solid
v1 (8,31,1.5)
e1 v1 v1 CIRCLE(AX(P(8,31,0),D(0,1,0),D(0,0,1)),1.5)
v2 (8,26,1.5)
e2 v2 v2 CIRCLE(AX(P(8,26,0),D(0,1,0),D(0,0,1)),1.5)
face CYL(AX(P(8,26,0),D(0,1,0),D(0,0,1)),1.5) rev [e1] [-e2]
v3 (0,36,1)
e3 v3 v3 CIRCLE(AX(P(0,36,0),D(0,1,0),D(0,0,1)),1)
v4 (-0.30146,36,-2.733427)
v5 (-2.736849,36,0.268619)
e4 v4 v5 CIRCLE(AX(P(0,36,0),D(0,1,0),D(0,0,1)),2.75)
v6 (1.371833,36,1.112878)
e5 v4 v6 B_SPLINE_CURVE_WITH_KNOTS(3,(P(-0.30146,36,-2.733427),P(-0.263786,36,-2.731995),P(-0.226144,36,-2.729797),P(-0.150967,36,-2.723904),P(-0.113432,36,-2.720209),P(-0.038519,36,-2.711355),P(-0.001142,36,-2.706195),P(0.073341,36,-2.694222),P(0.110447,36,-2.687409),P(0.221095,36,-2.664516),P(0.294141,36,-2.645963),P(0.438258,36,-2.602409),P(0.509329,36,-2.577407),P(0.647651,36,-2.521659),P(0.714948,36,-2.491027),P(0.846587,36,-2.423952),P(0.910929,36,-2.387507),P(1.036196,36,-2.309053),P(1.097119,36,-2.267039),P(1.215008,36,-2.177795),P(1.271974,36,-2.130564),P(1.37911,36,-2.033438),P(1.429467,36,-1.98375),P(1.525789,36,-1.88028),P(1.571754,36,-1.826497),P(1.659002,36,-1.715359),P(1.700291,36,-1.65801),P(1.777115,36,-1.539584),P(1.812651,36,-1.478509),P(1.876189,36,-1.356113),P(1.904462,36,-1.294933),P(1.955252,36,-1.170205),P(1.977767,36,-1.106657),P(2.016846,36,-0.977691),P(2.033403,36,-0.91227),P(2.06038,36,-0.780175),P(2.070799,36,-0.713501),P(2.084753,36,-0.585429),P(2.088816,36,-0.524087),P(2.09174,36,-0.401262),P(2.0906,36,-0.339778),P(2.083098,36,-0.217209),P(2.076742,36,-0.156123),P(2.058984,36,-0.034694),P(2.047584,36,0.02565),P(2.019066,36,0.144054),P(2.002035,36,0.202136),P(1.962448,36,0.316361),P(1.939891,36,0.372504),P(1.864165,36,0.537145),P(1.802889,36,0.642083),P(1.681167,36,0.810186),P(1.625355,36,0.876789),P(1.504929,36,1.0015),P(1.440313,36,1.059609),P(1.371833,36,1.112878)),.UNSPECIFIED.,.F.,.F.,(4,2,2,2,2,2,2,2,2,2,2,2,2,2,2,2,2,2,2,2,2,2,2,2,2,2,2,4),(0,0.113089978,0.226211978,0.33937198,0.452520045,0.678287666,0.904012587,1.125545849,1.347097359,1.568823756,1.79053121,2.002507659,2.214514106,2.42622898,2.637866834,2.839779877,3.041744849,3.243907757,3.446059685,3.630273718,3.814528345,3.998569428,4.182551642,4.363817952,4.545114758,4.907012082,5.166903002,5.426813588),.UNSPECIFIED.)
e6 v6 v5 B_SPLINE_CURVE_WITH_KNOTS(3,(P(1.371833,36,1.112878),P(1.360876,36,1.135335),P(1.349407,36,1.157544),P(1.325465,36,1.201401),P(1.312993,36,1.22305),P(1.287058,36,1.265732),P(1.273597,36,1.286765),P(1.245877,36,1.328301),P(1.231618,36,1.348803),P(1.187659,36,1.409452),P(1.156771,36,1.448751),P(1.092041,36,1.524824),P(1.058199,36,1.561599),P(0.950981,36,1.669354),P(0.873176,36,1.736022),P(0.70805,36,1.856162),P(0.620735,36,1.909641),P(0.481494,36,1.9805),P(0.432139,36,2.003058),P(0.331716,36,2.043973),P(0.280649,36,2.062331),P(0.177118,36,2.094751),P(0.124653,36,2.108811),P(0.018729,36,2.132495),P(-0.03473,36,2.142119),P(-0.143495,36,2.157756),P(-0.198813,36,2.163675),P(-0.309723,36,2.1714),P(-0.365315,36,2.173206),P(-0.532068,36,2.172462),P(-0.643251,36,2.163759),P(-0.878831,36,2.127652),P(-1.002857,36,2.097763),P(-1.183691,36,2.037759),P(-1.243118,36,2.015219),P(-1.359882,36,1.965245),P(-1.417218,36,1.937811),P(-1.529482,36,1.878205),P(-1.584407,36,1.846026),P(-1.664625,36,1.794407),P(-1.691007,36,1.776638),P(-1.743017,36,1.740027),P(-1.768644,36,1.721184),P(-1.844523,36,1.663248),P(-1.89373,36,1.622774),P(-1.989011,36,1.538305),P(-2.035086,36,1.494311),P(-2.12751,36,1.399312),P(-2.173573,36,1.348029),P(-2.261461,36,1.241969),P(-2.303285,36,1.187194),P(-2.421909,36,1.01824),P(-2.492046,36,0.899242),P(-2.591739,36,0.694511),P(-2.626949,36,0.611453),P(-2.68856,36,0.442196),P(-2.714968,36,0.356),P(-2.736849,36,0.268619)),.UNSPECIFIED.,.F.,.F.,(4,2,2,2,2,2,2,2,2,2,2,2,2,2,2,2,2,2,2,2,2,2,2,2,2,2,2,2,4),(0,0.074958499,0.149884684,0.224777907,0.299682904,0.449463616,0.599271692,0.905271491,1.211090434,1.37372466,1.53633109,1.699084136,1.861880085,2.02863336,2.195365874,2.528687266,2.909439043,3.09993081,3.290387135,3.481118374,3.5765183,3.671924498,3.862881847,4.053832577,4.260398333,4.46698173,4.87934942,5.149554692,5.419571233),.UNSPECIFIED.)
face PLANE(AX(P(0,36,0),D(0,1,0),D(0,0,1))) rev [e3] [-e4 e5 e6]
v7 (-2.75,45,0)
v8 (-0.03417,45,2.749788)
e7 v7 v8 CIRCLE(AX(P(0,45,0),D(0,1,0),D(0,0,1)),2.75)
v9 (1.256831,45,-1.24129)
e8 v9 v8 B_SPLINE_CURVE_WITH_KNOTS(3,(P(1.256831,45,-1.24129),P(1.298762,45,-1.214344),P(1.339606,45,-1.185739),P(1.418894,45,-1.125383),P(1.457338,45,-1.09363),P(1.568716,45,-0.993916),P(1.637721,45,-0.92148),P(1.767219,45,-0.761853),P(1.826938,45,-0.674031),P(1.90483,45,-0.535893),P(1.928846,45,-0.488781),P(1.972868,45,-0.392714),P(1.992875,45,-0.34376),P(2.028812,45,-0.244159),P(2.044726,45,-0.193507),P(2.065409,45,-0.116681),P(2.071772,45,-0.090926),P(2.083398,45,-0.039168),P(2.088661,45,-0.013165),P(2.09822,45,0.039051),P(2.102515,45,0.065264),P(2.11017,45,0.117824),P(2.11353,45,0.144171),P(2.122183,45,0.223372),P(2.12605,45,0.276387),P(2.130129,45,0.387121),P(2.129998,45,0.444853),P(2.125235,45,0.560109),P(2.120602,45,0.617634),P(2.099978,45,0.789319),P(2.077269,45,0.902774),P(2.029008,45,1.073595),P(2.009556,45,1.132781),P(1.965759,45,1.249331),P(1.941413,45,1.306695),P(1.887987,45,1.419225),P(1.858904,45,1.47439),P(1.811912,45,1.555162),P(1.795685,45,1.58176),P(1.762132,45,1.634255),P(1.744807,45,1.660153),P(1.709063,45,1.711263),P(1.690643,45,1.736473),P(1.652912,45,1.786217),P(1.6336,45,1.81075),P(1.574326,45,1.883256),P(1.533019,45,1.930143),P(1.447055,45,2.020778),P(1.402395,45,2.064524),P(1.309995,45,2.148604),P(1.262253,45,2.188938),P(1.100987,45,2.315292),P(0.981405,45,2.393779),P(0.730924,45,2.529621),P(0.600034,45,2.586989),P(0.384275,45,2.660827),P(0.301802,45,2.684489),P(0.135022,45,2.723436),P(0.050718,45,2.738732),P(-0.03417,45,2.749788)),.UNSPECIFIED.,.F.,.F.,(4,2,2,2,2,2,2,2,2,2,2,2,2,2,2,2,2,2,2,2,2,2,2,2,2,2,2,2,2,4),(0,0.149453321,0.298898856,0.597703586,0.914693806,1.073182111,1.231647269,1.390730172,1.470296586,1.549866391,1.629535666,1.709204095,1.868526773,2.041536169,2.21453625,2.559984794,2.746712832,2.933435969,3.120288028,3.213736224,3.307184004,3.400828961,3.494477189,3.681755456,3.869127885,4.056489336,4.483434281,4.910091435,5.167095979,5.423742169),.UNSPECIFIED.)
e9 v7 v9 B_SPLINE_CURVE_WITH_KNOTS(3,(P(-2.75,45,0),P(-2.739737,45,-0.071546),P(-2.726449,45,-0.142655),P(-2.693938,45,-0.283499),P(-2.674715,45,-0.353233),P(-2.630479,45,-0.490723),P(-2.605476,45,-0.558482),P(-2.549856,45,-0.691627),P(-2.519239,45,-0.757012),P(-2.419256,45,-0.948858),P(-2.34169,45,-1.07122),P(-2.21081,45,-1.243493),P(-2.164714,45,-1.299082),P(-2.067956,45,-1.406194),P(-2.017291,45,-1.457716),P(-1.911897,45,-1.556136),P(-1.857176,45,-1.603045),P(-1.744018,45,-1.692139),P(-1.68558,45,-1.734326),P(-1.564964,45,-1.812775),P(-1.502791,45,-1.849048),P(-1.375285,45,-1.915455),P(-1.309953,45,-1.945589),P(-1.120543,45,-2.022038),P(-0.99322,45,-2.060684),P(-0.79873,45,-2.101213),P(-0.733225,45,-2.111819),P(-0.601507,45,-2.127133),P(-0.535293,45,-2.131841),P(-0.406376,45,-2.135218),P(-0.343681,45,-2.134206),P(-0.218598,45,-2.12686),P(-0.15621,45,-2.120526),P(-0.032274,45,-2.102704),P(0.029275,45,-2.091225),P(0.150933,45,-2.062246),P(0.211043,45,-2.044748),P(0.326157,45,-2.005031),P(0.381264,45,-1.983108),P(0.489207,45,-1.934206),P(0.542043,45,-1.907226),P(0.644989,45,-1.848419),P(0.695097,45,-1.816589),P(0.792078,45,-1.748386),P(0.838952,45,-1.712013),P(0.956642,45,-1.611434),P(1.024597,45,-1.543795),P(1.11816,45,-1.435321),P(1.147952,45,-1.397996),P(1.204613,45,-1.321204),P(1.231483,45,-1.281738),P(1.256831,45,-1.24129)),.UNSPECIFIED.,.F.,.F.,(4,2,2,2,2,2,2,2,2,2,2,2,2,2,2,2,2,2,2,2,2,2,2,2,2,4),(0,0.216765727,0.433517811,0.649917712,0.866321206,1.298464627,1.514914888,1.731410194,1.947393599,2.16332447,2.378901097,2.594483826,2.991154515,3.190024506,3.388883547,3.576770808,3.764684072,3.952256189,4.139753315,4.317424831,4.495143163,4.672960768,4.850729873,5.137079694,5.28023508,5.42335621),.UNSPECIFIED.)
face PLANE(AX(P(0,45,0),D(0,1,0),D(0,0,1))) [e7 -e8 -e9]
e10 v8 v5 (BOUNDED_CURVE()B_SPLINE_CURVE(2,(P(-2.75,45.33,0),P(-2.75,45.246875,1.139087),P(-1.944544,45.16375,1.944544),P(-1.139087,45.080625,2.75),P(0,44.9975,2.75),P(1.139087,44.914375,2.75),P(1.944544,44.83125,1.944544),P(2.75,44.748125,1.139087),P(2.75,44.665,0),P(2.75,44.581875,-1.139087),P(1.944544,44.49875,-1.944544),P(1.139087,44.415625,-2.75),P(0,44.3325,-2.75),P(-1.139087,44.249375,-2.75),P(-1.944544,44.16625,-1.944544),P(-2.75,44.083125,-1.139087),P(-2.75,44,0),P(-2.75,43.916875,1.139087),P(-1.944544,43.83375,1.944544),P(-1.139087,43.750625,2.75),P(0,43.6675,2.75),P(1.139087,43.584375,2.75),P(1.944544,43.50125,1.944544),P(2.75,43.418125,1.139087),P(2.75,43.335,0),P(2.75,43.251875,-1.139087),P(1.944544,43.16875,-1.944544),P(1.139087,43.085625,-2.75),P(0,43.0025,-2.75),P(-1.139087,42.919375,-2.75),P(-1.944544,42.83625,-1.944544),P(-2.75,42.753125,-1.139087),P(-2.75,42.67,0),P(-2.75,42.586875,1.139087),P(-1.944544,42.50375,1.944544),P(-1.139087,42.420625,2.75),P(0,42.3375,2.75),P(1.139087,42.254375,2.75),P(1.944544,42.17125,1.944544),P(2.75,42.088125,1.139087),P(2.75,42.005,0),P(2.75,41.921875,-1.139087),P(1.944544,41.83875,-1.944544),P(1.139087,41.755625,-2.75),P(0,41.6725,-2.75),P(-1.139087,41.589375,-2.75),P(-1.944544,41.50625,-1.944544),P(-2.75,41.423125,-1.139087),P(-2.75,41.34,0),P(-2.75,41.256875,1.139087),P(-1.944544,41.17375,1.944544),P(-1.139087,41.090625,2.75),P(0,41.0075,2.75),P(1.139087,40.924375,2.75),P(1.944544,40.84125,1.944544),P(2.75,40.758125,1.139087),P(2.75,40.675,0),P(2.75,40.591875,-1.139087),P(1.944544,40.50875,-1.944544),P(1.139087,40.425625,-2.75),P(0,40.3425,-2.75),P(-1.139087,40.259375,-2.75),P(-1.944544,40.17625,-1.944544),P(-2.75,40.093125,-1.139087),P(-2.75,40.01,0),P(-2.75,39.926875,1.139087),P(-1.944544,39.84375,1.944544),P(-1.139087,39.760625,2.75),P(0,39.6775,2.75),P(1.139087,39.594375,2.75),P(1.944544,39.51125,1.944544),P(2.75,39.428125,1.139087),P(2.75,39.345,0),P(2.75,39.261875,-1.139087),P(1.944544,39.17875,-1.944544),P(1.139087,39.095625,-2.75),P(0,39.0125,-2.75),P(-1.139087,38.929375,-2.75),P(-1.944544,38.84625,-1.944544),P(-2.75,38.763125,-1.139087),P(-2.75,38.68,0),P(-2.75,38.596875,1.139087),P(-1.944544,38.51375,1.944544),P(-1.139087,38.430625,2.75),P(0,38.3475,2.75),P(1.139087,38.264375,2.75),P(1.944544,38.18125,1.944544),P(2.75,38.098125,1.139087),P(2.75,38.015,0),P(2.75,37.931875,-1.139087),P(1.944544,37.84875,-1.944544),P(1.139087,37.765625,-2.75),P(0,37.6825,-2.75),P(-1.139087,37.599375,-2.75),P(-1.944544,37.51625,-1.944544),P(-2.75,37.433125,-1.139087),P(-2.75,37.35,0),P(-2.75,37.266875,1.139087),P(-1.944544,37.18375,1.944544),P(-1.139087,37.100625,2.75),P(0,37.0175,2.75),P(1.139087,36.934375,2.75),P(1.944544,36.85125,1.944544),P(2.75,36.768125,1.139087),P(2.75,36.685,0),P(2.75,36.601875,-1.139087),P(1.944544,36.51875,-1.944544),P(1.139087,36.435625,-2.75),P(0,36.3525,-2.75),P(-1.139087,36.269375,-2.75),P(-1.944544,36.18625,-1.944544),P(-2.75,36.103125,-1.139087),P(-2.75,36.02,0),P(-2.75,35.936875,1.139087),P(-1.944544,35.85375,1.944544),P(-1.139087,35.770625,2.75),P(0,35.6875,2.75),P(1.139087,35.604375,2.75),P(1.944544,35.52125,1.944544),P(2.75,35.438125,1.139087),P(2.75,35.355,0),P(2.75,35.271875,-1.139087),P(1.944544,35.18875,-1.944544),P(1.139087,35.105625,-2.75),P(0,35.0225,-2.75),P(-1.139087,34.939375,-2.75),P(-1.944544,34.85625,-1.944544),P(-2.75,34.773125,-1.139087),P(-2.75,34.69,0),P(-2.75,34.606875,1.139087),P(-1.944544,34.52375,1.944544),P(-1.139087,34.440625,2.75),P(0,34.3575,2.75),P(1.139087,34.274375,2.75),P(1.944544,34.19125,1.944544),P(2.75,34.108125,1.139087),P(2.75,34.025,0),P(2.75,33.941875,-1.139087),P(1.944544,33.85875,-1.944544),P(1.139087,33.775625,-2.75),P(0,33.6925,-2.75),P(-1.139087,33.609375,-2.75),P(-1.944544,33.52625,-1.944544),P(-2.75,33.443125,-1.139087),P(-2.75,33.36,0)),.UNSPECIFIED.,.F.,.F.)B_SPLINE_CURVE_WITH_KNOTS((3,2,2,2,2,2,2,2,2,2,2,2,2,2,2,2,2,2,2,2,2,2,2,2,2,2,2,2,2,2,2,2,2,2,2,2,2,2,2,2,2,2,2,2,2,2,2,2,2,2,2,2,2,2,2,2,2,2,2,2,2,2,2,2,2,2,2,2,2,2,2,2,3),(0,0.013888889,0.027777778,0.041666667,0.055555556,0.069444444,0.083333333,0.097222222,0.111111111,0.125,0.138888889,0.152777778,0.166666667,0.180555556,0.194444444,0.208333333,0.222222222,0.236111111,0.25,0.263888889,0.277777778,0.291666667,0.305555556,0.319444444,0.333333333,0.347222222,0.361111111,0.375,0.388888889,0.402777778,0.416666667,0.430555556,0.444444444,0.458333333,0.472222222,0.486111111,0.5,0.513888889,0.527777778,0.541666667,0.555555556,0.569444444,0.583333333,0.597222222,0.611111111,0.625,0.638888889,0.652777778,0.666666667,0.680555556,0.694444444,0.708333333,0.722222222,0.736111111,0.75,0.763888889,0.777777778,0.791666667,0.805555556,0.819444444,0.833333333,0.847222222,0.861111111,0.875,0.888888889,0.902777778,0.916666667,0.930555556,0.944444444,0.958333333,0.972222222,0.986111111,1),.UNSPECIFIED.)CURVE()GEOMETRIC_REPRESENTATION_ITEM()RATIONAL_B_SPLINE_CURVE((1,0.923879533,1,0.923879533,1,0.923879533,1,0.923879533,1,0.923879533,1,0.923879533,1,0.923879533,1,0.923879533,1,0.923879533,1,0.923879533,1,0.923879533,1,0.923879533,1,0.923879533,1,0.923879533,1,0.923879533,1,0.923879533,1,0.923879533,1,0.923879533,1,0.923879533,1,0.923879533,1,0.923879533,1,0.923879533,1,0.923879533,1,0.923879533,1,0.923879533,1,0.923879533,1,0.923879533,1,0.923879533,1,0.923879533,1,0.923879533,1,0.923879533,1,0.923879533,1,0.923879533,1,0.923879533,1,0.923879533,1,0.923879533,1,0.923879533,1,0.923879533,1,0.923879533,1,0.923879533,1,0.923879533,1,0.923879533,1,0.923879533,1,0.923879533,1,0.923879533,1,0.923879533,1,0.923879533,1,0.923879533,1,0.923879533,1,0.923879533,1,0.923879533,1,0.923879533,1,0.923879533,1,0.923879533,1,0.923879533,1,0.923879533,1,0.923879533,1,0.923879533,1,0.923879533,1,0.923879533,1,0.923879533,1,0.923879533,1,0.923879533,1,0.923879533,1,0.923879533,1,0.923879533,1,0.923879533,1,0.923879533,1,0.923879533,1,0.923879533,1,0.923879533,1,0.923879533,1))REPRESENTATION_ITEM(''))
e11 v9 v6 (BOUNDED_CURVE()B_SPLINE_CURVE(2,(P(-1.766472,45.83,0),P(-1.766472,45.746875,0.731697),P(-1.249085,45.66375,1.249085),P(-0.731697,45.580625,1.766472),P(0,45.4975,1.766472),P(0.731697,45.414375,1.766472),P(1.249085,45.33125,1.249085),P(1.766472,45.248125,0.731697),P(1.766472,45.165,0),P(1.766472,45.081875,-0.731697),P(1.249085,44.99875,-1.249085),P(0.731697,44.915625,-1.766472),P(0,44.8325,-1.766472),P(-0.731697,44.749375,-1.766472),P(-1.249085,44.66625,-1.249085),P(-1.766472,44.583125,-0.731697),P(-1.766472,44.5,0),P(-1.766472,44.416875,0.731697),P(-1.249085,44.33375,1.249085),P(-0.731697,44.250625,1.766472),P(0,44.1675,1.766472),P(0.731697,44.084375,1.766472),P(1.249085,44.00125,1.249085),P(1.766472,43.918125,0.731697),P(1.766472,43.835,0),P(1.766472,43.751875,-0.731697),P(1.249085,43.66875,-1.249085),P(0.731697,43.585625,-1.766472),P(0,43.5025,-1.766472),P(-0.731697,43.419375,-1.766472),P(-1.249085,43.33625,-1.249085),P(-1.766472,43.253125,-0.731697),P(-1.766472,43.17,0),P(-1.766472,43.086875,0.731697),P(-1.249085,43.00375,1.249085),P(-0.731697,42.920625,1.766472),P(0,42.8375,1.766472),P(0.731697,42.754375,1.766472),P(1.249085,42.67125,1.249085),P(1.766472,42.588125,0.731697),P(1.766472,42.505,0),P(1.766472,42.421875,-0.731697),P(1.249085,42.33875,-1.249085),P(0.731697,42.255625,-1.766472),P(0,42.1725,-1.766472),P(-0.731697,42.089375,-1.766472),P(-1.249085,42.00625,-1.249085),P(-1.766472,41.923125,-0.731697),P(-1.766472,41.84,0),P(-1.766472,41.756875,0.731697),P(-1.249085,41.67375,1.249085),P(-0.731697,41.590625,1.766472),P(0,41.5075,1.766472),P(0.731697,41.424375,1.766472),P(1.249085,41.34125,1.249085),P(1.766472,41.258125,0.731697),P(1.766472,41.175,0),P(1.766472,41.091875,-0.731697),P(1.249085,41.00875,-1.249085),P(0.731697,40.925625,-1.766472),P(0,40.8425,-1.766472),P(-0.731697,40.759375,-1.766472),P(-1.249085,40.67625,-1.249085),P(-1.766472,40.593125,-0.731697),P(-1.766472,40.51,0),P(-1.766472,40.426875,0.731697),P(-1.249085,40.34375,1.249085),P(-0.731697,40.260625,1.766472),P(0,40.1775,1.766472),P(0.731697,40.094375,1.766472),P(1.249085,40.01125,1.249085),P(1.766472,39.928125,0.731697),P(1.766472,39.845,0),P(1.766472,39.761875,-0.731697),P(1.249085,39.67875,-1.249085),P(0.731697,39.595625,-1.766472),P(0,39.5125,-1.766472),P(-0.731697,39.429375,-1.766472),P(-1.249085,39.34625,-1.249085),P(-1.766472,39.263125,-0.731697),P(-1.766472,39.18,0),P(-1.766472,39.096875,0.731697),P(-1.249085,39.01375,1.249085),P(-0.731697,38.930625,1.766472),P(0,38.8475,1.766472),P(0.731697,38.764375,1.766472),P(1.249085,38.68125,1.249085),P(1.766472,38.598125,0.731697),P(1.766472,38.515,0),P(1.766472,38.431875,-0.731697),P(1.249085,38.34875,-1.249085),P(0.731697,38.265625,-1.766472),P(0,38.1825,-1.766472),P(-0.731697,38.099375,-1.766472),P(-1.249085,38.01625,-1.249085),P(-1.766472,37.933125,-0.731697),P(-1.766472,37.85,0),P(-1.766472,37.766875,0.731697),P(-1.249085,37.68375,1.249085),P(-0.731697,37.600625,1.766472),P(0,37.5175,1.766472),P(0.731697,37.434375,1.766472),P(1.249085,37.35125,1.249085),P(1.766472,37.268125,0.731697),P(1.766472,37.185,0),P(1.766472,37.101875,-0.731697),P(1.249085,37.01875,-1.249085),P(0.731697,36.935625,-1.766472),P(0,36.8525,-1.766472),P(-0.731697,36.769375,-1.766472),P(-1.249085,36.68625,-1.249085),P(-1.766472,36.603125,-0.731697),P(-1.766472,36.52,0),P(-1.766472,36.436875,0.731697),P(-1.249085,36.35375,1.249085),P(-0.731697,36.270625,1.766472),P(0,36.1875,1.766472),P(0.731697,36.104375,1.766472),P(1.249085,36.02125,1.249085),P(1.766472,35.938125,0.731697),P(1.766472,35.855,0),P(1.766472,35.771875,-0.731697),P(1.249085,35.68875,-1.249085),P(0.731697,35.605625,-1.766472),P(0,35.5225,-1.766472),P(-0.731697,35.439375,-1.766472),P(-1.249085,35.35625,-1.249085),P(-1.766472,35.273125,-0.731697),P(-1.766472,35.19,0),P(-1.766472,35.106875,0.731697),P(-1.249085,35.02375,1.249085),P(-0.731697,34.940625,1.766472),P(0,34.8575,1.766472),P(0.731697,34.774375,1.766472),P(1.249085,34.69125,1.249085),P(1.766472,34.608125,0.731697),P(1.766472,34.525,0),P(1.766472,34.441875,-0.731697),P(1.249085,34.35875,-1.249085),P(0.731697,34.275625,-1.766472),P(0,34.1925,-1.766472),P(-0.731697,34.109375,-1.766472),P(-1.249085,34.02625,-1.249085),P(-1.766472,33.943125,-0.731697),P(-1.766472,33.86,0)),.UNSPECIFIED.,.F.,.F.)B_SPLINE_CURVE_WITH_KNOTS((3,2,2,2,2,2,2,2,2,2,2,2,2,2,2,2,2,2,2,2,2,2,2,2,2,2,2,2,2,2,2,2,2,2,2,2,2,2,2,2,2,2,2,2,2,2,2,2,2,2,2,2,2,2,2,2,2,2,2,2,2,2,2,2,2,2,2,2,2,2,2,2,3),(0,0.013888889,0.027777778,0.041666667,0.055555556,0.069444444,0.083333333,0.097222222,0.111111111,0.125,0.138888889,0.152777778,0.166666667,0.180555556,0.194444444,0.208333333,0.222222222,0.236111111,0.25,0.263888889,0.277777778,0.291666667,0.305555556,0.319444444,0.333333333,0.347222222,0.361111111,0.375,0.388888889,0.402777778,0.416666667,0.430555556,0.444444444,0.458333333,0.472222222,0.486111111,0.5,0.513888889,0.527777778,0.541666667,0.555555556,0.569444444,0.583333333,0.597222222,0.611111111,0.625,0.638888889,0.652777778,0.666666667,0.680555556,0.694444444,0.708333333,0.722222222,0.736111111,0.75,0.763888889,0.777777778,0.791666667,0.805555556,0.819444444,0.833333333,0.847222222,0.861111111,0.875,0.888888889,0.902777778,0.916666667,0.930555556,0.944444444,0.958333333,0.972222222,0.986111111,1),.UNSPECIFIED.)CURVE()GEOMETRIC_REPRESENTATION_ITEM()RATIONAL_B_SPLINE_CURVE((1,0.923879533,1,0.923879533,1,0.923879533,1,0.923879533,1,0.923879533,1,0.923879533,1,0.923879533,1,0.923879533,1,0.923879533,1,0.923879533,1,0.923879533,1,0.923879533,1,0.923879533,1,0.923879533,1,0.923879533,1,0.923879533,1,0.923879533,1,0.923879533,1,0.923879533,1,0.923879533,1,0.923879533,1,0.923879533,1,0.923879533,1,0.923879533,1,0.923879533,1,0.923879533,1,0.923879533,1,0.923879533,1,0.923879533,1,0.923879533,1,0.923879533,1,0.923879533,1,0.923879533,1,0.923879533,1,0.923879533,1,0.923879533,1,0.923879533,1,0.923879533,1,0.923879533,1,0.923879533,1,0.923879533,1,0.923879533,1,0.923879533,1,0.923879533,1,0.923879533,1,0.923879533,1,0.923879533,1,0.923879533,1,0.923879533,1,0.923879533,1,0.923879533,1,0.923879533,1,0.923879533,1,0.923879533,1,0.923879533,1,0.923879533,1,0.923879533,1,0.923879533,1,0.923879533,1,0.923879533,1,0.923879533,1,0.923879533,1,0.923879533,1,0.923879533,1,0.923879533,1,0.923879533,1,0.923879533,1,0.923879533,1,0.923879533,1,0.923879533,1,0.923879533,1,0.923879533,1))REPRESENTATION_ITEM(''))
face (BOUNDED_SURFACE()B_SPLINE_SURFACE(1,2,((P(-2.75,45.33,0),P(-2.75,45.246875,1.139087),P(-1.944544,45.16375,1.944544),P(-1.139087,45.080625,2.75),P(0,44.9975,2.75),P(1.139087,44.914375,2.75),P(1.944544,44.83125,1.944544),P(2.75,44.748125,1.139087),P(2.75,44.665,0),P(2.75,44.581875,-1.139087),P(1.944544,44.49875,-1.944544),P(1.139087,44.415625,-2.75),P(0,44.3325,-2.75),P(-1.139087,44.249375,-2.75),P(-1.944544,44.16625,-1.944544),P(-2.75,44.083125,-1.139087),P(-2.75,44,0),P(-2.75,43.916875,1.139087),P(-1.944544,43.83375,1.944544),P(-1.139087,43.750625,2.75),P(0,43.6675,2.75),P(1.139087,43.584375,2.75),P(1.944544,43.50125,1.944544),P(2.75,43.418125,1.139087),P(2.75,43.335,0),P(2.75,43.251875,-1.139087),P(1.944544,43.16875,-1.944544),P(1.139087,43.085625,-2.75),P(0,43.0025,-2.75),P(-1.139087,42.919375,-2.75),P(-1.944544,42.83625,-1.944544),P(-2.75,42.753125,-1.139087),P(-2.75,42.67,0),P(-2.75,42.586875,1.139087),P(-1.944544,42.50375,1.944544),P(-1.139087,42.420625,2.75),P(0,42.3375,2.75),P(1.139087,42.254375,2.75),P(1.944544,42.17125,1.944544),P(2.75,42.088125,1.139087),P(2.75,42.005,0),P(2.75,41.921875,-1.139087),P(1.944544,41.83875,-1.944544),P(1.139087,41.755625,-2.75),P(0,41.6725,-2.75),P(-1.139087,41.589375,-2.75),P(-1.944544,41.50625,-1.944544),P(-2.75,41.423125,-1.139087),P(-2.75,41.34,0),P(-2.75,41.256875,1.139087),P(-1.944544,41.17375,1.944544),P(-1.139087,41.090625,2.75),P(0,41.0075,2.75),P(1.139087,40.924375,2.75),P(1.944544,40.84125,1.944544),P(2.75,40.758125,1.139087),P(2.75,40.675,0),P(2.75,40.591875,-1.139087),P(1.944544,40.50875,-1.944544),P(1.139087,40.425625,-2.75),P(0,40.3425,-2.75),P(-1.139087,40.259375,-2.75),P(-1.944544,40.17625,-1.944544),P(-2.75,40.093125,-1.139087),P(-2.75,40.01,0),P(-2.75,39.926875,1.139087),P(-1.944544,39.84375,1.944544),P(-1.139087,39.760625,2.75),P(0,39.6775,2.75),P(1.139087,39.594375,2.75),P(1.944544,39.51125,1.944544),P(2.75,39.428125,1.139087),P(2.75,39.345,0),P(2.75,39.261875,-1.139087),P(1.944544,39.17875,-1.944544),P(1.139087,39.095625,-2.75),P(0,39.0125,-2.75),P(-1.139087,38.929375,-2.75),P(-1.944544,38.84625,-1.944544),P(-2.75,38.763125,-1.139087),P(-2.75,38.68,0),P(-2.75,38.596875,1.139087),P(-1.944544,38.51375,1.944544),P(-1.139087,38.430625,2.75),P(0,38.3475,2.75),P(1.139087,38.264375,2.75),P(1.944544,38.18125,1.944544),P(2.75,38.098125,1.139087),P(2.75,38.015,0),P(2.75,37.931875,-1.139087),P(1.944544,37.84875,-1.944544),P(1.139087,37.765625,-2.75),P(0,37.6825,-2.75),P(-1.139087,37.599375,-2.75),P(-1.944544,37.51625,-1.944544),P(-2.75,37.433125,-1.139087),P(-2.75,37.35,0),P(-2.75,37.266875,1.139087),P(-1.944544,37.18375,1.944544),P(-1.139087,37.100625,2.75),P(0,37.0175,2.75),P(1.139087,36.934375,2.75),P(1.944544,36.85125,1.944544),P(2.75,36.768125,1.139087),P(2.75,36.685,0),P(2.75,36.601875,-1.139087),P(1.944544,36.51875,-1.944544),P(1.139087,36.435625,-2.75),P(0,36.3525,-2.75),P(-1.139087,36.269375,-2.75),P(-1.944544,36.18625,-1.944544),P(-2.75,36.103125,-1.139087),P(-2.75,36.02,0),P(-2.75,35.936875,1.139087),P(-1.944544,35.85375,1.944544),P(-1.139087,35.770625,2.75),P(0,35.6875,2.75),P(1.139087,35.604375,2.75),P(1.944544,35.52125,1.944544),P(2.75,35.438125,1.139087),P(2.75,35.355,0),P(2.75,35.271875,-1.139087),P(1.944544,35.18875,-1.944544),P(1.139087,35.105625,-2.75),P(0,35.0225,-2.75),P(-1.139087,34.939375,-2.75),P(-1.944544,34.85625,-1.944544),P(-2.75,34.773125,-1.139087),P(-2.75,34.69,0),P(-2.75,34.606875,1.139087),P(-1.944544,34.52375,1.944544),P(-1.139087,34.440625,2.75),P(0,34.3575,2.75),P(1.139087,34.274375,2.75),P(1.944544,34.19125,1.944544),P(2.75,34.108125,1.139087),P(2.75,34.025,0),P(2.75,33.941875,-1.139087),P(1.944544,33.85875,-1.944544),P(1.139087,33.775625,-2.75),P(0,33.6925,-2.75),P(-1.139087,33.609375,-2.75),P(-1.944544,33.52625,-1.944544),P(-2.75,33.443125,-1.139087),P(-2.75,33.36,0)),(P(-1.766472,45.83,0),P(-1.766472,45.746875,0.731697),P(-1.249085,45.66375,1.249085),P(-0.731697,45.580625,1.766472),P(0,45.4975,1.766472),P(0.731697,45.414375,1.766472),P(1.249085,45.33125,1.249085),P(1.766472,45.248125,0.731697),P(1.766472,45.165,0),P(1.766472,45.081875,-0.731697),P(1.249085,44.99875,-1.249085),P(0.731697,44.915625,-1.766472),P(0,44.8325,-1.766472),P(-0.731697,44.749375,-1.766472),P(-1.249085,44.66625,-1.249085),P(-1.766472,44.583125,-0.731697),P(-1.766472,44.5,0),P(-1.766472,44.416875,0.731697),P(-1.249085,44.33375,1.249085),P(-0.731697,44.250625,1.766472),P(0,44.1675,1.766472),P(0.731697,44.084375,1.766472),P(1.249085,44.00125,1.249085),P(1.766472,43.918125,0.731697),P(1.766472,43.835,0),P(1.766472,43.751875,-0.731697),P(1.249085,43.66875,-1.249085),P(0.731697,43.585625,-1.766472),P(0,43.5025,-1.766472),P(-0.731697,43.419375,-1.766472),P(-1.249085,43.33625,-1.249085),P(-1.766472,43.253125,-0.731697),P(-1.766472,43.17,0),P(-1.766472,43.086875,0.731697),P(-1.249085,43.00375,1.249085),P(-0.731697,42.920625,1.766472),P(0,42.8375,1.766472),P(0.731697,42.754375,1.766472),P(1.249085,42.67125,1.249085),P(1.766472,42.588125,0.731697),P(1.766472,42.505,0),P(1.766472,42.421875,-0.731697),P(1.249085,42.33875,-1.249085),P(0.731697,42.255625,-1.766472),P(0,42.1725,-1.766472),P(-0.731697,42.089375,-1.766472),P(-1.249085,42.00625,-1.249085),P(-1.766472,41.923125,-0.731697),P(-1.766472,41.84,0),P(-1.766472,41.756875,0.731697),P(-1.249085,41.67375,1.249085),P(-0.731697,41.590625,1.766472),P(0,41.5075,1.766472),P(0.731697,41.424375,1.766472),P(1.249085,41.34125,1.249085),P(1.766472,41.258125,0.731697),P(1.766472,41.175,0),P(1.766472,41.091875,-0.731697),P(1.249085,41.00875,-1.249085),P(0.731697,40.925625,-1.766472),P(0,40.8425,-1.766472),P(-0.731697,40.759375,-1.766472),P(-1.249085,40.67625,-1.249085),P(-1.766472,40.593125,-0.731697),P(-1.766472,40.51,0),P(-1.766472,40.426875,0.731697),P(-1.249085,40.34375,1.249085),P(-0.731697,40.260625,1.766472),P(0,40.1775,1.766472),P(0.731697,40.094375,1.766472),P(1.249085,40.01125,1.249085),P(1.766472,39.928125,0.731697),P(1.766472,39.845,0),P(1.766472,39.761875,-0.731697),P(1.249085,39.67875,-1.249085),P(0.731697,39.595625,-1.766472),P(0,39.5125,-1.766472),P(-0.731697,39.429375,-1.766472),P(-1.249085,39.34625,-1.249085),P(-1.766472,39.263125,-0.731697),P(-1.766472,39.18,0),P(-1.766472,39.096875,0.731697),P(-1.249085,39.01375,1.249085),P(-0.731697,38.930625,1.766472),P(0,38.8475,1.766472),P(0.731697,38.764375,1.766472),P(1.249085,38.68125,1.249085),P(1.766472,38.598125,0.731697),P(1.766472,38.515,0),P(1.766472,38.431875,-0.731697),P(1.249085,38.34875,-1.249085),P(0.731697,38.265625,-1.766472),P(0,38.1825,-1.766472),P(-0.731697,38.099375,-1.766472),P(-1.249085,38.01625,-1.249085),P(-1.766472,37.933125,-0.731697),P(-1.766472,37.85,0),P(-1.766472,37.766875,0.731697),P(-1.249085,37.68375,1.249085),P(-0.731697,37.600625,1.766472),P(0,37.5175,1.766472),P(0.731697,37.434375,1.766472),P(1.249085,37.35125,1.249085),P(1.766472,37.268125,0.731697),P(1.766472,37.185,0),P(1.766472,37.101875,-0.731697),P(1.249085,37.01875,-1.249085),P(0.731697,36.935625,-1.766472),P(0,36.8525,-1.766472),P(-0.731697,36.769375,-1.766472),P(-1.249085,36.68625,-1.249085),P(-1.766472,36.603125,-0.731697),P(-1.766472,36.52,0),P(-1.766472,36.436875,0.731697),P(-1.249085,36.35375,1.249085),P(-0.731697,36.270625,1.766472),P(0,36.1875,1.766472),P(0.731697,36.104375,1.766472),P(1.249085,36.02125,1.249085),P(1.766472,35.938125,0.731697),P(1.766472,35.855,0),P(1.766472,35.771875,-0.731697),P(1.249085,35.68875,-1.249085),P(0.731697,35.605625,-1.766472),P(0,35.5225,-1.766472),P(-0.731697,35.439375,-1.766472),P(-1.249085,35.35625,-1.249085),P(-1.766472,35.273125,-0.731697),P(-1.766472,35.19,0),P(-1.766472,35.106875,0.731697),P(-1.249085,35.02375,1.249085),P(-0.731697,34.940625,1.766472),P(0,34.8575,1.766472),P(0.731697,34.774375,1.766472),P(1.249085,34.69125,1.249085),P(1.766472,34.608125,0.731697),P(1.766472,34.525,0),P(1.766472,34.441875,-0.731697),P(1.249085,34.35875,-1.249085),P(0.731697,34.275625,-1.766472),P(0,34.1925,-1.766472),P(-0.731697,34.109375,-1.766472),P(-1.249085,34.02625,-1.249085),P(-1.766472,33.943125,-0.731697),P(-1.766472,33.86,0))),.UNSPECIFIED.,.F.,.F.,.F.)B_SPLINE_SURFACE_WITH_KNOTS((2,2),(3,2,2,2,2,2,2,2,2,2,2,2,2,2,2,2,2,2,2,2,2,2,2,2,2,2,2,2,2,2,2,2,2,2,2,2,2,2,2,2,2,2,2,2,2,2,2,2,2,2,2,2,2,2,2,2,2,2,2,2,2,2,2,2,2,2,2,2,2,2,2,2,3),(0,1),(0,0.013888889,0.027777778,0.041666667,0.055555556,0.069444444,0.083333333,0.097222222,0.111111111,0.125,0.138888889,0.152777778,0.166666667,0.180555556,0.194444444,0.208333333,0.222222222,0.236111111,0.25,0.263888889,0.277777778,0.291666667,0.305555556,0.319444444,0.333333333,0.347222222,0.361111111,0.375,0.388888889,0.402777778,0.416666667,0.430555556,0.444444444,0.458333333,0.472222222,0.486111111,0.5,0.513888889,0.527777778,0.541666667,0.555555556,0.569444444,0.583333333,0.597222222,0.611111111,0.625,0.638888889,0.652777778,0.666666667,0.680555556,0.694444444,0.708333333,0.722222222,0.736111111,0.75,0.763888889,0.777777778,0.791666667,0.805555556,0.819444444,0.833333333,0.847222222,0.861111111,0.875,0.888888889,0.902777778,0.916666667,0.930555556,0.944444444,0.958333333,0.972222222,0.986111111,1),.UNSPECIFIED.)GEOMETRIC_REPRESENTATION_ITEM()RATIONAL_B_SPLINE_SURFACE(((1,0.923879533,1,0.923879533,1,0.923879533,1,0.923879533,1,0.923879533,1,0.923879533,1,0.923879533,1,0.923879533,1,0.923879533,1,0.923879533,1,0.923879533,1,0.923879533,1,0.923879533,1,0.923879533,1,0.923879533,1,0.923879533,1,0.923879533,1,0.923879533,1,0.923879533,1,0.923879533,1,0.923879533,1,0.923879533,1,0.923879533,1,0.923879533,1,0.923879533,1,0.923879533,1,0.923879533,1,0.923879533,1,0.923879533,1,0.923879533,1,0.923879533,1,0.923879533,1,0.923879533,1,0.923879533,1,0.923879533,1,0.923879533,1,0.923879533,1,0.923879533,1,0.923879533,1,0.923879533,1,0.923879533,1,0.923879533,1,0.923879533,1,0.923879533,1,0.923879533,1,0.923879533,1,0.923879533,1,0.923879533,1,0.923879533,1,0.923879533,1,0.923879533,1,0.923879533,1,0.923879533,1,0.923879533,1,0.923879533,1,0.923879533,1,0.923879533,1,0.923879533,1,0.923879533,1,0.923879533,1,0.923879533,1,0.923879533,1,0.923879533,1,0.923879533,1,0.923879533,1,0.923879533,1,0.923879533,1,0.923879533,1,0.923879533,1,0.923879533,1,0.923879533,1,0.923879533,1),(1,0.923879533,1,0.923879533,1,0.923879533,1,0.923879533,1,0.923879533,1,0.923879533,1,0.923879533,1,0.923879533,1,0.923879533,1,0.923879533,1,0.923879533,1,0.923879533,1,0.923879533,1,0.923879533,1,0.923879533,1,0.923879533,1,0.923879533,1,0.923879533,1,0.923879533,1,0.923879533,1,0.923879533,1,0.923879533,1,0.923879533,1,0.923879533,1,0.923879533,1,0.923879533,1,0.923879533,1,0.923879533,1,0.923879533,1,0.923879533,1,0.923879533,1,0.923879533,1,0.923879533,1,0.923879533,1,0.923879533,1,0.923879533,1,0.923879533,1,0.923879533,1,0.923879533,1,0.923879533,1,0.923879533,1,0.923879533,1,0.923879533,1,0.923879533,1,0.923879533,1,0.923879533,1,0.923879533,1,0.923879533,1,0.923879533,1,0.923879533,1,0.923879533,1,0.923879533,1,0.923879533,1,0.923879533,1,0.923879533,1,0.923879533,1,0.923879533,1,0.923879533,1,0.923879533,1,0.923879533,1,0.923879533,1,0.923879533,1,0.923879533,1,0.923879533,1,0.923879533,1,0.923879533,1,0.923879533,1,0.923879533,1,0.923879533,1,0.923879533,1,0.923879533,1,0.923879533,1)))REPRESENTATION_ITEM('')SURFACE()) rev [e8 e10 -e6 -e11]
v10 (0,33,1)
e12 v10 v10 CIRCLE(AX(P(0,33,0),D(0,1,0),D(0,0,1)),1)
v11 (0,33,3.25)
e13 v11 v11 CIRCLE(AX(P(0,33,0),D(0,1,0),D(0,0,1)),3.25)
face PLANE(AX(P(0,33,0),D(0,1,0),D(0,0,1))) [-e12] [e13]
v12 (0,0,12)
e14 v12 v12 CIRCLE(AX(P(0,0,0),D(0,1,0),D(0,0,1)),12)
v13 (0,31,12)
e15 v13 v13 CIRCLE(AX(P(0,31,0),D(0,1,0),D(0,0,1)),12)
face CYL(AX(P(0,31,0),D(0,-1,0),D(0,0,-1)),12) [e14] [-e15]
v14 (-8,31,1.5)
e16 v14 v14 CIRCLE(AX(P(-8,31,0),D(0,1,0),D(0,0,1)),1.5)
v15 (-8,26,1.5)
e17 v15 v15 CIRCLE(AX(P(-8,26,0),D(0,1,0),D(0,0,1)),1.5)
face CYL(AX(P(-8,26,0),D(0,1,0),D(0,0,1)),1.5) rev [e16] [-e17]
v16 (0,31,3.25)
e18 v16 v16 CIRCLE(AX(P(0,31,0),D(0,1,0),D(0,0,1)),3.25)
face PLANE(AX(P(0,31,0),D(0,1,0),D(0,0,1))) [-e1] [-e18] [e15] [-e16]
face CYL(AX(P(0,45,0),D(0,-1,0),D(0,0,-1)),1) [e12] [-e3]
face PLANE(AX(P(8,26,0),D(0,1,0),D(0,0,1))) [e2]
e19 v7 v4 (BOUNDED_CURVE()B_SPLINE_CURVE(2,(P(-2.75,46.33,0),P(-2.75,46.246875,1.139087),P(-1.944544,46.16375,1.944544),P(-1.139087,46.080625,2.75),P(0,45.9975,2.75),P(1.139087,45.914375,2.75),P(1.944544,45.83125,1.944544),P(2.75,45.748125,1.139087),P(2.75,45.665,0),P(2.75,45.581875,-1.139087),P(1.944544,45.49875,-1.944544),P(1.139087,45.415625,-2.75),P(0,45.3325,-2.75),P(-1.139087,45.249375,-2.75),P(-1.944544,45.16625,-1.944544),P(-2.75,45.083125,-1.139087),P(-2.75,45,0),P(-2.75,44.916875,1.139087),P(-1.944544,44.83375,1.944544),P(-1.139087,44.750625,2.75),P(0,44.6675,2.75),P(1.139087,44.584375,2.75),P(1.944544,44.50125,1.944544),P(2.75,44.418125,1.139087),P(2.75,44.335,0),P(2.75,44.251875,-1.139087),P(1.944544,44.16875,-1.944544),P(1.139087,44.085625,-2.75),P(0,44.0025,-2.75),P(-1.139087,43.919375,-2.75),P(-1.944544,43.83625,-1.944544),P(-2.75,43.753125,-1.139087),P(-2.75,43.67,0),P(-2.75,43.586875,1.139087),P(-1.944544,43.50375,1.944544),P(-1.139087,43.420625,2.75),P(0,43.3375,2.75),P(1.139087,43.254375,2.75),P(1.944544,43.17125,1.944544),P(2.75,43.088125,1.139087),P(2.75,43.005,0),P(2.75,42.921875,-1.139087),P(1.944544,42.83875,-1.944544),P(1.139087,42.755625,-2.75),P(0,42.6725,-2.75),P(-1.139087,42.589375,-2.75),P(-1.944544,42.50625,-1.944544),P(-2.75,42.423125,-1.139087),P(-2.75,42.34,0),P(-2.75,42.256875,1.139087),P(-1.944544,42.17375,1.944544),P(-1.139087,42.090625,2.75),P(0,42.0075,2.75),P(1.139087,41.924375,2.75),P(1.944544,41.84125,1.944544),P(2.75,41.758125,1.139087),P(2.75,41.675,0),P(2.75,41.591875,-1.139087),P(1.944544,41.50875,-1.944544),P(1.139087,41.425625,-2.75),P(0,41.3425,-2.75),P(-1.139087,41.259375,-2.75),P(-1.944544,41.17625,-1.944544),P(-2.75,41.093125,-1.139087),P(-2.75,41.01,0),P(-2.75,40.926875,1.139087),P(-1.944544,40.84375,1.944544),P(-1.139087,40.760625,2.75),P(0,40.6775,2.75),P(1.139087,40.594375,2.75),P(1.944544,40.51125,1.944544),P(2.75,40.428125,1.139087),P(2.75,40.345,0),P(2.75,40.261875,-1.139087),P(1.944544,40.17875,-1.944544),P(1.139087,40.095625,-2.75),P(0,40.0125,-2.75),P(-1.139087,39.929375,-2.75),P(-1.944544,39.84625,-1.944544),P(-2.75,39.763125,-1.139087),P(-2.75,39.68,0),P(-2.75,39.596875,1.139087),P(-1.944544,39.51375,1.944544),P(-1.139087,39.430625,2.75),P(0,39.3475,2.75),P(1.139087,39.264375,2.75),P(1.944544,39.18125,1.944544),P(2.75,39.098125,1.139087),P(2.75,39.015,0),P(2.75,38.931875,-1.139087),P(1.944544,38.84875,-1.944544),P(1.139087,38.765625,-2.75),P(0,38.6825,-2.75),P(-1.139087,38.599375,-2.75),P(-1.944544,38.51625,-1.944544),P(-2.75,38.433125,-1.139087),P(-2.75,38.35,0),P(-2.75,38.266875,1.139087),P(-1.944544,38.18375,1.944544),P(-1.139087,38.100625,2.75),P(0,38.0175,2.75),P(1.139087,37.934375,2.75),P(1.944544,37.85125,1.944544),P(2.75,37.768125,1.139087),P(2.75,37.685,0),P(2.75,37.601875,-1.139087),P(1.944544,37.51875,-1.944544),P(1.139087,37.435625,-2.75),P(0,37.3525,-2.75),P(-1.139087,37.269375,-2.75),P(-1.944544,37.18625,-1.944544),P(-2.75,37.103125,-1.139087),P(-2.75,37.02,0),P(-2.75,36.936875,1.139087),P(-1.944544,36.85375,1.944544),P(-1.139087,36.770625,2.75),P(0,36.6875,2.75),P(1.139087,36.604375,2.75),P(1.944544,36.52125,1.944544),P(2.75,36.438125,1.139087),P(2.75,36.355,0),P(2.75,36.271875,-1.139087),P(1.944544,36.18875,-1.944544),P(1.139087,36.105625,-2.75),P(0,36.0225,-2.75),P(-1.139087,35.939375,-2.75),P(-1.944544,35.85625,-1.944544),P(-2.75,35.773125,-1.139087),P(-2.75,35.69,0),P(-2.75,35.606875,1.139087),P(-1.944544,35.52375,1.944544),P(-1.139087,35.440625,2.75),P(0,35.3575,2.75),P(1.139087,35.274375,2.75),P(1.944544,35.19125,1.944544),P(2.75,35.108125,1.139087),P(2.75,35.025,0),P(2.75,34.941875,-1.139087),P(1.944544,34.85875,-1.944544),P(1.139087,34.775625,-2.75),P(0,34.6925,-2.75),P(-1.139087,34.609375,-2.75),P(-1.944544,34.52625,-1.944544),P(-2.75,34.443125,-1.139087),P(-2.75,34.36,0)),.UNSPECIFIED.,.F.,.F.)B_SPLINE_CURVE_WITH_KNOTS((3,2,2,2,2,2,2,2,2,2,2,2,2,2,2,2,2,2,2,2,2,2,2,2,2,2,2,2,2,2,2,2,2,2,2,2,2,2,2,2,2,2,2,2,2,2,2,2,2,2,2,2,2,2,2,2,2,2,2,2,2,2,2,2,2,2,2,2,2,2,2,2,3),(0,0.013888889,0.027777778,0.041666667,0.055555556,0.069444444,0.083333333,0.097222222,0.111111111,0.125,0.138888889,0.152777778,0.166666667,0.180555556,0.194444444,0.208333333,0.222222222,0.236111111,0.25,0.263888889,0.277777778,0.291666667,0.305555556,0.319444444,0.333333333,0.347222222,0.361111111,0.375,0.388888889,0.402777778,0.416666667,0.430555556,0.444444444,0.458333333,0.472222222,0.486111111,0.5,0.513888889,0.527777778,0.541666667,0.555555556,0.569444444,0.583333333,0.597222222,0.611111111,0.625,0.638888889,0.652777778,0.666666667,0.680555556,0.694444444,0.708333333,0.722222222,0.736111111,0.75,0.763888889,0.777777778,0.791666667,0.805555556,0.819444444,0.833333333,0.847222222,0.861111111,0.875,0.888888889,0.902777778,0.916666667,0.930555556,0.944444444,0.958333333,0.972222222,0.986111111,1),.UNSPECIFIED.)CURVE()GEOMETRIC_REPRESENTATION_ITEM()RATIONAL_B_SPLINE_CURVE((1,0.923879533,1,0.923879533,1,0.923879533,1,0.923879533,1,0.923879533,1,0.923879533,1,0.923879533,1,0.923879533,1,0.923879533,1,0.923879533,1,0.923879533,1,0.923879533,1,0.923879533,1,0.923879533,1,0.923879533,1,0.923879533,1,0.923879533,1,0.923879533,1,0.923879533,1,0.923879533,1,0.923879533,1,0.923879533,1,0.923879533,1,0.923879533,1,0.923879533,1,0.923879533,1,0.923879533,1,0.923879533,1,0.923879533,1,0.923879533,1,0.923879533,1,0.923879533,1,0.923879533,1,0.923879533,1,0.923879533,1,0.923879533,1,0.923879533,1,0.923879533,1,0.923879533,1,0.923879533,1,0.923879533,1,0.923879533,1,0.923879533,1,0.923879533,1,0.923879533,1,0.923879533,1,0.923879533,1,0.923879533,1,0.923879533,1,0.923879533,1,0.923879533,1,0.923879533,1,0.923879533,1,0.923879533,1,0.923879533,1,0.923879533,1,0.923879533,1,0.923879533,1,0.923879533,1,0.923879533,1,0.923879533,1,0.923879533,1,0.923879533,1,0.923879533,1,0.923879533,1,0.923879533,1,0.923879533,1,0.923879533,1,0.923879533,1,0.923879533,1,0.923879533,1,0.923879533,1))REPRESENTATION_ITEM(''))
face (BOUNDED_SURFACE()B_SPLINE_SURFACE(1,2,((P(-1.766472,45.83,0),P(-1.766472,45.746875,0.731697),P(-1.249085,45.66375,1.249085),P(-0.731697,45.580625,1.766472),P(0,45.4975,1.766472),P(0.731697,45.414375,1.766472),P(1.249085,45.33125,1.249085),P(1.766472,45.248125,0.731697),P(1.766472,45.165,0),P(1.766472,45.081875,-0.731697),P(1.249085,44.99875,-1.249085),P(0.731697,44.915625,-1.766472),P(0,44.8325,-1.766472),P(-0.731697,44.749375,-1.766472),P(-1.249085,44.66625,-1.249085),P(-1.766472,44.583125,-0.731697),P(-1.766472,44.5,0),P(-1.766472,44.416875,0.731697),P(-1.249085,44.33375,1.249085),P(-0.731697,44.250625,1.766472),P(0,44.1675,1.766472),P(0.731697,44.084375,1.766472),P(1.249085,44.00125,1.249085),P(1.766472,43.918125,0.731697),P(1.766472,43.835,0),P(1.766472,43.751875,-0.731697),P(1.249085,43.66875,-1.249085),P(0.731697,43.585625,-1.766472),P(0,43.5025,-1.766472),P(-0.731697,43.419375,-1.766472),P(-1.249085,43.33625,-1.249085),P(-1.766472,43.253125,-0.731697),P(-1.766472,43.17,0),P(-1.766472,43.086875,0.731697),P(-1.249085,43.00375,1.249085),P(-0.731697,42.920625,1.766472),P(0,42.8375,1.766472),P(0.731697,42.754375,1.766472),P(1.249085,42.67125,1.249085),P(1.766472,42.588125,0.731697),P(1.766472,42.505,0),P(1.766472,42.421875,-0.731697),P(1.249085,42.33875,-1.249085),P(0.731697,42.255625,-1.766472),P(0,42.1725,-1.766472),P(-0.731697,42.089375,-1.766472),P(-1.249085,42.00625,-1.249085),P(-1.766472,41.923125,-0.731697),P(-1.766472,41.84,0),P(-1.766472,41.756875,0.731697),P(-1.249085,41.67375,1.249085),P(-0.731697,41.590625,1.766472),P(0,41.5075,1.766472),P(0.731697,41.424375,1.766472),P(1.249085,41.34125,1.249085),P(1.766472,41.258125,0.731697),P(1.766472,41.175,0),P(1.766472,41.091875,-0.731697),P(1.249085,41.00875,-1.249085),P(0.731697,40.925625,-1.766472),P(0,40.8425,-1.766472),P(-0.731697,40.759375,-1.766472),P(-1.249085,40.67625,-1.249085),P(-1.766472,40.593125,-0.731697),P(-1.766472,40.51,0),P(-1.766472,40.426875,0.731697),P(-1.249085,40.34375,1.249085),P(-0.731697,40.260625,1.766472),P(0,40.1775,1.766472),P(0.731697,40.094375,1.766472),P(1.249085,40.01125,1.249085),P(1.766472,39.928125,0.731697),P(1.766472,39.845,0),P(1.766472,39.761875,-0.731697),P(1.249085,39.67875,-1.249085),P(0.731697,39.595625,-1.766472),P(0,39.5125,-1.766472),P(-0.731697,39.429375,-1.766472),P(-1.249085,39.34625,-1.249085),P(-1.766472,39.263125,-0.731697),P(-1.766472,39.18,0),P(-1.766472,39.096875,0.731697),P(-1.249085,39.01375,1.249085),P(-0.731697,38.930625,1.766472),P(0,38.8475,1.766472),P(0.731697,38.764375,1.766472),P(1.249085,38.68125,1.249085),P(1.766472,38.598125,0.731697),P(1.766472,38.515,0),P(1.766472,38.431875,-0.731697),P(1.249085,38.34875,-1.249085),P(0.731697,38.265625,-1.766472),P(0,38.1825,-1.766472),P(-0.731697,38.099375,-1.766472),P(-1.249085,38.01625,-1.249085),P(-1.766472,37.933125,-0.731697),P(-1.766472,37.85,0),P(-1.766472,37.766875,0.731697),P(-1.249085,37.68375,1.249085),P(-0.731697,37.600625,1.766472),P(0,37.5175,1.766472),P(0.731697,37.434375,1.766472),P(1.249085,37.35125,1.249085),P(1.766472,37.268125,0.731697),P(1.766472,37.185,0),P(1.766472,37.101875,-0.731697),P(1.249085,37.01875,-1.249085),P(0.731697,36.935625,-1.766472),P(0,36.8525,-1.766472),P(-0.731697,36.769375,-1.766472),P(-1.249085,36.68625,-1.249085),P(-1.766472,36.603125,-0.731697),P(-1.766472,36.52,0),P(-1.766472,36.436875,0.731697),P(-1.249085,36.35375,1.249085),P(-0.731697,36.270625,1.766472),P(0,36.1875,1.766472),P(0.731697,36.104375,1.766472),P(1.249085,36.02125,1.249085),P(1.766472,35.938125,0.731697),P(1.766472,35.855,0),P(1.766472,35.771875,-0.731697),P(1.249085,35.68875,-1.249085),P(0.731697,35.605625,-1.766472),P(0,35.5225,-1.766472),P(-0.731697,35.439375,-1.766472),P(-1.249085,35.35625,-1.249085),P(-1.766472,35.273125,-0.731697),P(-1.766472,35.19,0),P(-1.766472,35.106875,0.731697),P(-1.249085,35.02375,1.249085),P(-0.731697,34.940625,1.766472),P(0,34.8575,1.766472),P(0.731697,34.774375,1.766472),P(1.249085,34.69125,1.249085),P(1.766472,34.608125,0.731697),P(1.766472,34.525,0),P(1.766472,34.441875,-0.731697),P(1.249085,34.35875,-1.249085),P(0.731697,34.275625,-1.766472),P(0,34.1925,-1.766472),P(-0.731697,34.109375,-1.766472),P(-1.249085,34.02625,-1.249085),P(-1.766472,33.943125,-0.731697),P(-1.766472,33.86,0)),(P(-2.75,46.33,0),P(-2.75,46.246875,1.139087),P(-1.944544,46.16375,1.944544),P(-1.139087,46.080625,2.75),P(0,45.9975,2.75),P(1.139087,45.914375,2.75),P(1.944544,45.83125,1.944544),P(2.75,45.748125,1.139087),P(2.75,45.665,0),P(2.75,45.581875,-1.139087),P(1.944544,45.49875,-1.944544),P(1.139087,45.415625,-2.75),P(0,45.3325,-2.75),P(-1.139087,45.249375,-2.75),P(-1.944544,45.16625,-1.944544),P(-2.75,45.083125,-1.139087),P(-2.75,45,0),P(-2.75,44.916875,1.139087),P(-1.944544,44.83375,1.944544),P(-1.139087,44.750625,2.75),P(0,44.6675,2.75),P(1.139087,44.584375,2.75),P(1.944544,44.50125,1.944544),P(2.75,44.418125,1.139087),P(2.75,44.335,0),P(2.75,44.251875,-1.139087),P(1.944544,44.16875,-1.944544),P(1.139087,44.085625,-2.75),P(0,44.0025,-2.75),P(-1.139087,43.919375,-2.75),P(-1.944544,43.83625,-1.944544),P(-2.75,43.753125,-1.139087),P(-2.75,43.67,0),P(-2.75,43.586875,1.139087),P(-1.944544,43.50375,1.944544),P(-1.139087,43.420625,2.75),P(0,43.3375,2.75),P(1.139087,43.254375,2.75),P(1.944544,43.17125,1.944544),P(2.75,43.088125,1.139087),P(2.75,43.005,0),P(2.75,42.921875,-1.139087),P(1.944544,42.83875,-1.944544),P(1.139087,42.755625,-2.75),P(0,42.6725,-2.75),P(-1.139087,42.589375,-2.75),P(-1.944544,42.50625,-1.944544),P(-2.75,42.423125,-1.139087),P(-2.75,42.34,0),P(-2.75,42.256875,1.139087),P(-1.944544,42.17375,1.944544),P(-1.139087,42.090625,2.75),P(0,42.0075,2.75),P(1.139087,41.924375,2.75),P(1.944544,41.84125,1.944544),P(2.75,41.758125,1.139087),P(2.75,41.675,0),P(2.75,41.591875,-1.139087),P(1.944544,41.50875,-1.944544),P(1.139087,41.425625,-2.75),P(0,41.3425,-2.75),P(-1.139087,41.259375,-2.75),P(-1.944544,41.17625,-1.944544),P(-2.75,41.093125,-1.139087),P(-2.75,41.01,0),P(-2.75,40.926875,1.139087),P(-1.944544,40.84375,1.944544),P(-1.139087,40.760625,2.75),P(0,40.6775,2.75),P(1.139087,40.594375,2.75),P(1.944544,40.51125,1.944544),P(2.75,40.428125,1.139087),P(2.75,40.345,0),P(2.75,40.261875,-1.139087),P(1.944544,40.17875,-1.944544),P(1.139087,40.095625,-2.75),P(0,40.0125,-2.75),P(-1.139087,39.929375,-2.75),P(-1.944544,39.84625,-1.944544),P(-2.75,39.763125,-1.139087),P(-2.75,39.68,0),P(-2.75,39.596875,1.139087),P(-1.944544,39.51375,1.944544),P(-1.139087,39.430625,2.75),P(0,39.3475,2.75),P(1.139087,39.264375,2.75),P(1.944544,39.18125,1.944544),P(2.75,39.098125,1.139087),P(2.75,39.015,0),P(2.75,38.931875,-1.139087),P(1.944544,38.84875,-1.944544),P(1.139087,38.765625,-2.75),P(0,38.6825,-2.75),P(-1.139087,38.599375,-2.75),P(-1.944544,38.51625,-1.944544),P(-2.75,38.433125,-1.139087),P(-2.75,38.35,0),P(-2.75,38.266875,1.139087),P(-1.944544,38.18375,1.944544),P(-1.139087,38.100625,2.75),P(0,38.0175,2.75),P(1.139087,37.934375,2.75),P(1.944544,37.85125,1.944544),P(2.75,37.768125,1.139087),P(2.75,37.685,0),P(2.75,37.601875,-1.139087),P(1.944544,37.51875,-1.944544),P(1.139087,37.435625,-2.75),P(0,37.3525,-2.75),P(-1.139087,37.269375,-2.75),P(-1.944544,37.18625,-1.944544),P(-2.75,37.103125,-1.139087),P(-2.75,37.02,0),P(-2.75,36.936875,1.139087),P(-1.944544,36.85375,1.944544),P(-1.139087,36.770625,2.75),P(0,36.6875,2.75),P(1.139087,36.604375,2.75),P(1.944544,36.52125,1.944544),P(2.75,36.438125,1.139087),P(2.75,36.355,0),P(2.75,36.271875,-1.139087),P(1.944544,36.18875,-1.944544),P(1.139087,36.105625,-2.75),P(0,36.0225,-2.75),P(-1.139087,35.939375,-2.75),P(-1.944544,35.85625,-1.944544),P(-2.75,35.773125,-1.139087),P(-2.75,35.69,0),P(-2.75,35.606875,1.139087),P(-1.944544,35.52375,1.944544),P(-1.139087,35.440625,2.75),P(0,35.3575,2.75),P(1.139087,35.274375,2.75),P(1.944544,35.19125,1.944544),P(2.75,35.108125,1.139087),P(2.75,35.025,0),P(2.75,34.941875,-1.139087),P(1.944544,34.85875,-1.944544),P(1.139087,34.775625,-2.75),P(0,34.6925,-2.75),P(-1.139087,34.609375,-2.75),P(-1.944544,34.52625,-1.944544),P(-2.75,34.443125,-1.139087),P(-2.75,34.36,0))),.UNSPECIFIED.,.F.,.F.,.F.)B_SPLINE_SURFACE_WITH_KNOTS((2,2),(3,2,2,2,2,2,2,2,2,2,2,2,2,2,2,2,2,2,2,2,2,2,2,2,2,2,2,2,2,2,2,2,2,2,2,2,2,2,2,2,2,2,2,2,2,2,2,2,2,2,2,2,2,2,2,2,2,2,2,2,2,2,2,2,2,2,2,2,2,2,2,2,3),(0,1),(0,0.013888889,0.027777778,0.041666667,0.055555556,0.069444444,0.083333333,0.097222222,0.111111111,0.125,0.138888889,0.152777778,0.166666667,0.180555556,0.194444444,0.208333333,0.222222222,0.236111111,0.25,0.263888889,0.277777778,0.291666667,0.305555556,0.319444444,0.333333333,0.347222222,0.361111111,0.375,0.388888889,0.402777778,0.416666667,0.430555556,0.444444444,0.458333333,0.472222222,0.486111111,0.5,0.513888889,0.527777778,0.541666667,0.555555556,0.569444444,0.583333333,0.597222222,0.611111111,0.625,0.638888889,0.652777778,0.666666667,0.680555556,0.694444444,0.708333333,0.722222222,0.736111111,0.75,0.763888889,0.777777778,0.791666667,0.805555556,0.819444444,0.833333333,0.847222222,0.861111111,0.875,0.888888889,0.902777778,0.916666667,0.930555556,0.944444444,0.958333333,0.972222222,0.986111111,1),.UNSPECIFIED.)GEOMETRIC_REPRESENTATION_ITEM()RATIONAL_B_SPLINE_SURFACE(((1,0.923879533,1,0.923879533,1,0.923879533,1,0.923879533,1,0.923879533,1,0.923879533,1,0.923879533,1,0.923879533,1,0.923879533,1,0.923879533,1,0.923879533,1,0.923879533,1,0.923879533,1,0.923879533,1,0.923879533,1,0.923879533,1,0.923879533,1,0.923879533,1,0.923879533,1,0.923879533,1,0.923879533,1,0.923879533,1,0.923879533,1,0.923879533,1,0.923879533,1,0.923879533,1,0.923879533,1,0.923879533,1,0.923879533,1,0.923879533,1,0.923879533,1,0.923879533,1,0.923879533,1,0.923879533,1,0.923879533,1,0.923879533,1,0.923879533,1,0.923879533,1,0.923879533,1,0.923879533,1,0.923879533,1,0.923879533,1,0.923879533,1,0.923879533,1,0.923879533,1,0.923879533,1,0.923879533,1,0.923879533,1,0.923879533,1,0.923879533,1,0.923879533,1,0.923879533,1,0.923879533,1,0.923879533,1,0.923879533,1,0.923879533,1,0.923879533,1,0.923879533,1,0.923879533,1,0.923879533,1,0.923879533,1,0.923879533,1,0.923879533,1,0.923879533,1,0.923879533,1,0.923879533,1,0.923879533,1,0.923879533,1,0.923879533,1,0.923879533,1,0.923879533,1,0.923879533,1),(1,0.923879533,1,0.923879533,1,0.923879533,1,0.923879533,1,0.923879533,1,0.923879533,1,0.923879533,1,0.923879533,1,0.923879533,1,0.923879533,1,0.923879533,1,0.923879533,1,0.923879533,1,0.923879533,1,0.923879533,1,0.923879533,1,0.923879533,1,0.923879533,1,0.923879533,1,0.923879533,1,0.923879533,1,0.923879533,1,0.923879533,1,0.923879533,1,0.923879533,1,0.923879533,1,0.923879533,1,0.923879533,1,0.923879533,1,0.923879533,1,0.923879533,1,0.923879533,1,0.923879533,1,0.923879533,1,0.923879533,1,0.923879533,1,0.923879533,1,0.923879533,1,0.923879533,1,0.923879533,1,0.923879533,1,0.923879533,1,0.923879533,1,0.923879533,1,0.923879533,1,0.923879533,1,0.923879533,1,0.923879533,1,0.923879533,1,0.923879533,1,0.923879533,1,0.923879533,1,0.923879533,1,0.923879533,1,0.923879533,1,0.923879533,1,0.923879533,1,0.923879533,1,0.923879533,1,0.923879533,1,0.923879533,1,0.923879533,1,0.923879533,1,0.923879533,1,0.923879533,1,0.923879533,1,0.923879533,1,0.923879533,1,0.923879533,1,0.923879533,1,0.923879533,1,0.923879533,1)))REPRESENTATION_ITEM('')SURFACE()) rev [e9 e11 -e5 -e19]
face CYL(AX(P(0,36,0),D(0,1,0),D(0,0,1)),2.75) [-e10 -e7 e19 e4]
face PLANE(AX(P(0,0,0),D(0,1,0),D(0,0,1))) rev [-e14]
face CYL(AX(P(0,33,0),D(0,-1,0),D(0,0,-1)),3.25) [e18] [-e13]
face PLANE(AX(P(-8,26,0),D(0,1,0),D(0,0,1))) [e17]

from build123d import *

# Parameters (mm, degrees)
SKETCH1_R           = 12
BOSS_EXTRUDE1_DEPTH = 31
SKETCH2_R           = 1.5
CUT_EXTRUDE1_DEPTH  = 5
SKETCH3_R           = 3.25
BOSS_EXTRUDE2_DEPTH = 2
SKETCH4_R           = 1
BOSS_EXTRUDE3_DEPTH = 12
SKETCH5_R           = 2.75
BOSS_EXTRUDE4_DEPTH = 9
CUT_SWEEP6_PITCH    = 1.33


with BuildPart() as part:
    # Sketch1 → Boss-Extrude1 (new body)
    with BuildSketch(Plane(origin=(0, 0, 0), x_dir=(1, 0, 0), z_dir=(0, 1, 0))):
        with Locations(Location((0, 0, 0), (0, 0, 270))):
            Circle(SKETCH1_R)
    extrude(amount=BOSS_EXTRUDE1_DEPTH)

    # Sketch2 → Cut-Extrude1 (cut)
    with BuildSketch(Plane(origin=(0, 31, 0), x_dir=(1, 0, 0), z_dir=(0, 1, 0))):
        with Locations(Location((8, 0, 0), (0, 0, 270))):
            Circle(SKETCH2_R)
        with Locations(Location((-8, 0, 0), (0, 0, 270))):
            Circle(SKETCH2_R)
    extrude(amount=-CUT_EXTRUDE1_DEPTH, mode=Mode.SUBTRACT)

    # Sketch3 → Boss-Extrude2 (add)
    with BuildSketch(Plane(origin=(0, 31, 0), x_dir=(1, 0, 0), z_dir=(0, 1, 0))):
        with Locations(Location((0, 0, 0), (0, 0, 270))):
            Circle(SKETCH3_R)
    extrude(amount=BOSS_EXTRUDE2_DEPTH)

    # Sketch4 → Boss-Extrude3 (add)
    with BuildSketch(Plane(origin=(0, 33, 0), x_dir=(1, 0, 0), z_dir=(0, 1, 0))):
        with Locations(Location((0, 0, 0), (0, 0, 270))):
            Circle(SKETCH4_R)
    extrude(amount=BOSS_EXTRUDE3_DEPTH)

    # Sketch5 → Boss-Extrude4 (add)
    with BuildSketch(Plane(origin=(0, 45, 0), x_dir=(1, 0, 0), z_dir=(0, 1, 0))):
        with Locations(Location((0, 0, 0), (0, 0, 270))):
            Circle(SKETCH5_R)
    extrude(amount=-BOSS_EXTRUDE4_DEPTH)

    # Cut-Sweep6: arcs per turn and ends read off the stored shape
    # Cut-Sweep6: the profile of Sketch6 profile screwed along a left-hand helix through 9 turns, 8 arcs to a turn; built about Z, then put on its axis
    cut_sweep6_z = Axis((0, 0, 0), (0, 0, 1))
    cut_sweep6_corners = [(2.7503, 0, -1.330152512), (1.766472482, 0, -0.83), (2.7503, 0, -0.329847488)]
    with BuildLine(mode=Mode.PRIVATE) as cut_sweep6_profile:
        Line(cut_sweep6_corners[0], cut_sweep6_corners[1])
        Line(cut_sweep6_corners[1], cut_sweep6_corners[2])
        Line(cut_sweep6_corners[2], cut_sweep6_corners[0])
    cut_sweep6_cap = Face(cut_sweep6_profile.wire())
    cut_sweep6_turn_angles = [0, -22.5, -45, -67.5, -90, -112.5, -135, -157.5, -180, -202.5, -225, -247.5, -270, -292.5, -315, -337.5, -360]
    cut_sweep6_turn_weights = [1, 0.9238795325112867, 1, 0.9238795325112867, 1, 0.9238795325112867, 1, 0.9238795325112867, 1, 0.9238795325112867, 1, 0.9238795325112867, 1, 0.9238795325112867, 1, 0.9238795325112867, 1]
    cut_sweep6_turn_rails = [Edge.make_bspline([Vector(p[0], p[1], 0).rotate(cut_sweep6_z, cut_sweep6_turn_angles[k]) / cut_sweep6_turn_weights[k] + Vector(0, 0, p[2] + -CUT_SWEEP6_PITCH * cut_sweep6_turn_angles[k] / 360) for k in range(17)], [0, 0, 0, 1, 1, 2, 2, 3, 3, 4, 4, 5, 5, 6, 6, 7, 7, 8, 8, 8], 2, cut_sweep6_turn_weights) for p in cut_sweep6_corners]
    cut_sweep6_turn_sides = [Face.make_surface_from_curves(cut_sweep6_turn_rails[p[0]], cut_sweep6_turn_rails[p[1]]) for p in [(0, 1), (1, 2), (2, 0)]]
    cut_sweep6 = Plane(origin=(0, 45, 0), x_dir=(-1, 0, 0), z_dir=(0, -1, 0)) * Solid(Shell([*[p.moved(Location((0, 0, CUT_SWEEP6_PITCH * i))) for i in range(9) for p in cut_sweep6_turn_sides], cut_sweep6_cap, cut_sweep6_cap.rotate(cut_sweep6_z, -3240).moved(Location((0, 0, -CUT_SWEEP6_PITCH * -3240 / 360)))]))
    add(cut_sweep6, mode=Mode.SUBTRACT)


solid = part.part
